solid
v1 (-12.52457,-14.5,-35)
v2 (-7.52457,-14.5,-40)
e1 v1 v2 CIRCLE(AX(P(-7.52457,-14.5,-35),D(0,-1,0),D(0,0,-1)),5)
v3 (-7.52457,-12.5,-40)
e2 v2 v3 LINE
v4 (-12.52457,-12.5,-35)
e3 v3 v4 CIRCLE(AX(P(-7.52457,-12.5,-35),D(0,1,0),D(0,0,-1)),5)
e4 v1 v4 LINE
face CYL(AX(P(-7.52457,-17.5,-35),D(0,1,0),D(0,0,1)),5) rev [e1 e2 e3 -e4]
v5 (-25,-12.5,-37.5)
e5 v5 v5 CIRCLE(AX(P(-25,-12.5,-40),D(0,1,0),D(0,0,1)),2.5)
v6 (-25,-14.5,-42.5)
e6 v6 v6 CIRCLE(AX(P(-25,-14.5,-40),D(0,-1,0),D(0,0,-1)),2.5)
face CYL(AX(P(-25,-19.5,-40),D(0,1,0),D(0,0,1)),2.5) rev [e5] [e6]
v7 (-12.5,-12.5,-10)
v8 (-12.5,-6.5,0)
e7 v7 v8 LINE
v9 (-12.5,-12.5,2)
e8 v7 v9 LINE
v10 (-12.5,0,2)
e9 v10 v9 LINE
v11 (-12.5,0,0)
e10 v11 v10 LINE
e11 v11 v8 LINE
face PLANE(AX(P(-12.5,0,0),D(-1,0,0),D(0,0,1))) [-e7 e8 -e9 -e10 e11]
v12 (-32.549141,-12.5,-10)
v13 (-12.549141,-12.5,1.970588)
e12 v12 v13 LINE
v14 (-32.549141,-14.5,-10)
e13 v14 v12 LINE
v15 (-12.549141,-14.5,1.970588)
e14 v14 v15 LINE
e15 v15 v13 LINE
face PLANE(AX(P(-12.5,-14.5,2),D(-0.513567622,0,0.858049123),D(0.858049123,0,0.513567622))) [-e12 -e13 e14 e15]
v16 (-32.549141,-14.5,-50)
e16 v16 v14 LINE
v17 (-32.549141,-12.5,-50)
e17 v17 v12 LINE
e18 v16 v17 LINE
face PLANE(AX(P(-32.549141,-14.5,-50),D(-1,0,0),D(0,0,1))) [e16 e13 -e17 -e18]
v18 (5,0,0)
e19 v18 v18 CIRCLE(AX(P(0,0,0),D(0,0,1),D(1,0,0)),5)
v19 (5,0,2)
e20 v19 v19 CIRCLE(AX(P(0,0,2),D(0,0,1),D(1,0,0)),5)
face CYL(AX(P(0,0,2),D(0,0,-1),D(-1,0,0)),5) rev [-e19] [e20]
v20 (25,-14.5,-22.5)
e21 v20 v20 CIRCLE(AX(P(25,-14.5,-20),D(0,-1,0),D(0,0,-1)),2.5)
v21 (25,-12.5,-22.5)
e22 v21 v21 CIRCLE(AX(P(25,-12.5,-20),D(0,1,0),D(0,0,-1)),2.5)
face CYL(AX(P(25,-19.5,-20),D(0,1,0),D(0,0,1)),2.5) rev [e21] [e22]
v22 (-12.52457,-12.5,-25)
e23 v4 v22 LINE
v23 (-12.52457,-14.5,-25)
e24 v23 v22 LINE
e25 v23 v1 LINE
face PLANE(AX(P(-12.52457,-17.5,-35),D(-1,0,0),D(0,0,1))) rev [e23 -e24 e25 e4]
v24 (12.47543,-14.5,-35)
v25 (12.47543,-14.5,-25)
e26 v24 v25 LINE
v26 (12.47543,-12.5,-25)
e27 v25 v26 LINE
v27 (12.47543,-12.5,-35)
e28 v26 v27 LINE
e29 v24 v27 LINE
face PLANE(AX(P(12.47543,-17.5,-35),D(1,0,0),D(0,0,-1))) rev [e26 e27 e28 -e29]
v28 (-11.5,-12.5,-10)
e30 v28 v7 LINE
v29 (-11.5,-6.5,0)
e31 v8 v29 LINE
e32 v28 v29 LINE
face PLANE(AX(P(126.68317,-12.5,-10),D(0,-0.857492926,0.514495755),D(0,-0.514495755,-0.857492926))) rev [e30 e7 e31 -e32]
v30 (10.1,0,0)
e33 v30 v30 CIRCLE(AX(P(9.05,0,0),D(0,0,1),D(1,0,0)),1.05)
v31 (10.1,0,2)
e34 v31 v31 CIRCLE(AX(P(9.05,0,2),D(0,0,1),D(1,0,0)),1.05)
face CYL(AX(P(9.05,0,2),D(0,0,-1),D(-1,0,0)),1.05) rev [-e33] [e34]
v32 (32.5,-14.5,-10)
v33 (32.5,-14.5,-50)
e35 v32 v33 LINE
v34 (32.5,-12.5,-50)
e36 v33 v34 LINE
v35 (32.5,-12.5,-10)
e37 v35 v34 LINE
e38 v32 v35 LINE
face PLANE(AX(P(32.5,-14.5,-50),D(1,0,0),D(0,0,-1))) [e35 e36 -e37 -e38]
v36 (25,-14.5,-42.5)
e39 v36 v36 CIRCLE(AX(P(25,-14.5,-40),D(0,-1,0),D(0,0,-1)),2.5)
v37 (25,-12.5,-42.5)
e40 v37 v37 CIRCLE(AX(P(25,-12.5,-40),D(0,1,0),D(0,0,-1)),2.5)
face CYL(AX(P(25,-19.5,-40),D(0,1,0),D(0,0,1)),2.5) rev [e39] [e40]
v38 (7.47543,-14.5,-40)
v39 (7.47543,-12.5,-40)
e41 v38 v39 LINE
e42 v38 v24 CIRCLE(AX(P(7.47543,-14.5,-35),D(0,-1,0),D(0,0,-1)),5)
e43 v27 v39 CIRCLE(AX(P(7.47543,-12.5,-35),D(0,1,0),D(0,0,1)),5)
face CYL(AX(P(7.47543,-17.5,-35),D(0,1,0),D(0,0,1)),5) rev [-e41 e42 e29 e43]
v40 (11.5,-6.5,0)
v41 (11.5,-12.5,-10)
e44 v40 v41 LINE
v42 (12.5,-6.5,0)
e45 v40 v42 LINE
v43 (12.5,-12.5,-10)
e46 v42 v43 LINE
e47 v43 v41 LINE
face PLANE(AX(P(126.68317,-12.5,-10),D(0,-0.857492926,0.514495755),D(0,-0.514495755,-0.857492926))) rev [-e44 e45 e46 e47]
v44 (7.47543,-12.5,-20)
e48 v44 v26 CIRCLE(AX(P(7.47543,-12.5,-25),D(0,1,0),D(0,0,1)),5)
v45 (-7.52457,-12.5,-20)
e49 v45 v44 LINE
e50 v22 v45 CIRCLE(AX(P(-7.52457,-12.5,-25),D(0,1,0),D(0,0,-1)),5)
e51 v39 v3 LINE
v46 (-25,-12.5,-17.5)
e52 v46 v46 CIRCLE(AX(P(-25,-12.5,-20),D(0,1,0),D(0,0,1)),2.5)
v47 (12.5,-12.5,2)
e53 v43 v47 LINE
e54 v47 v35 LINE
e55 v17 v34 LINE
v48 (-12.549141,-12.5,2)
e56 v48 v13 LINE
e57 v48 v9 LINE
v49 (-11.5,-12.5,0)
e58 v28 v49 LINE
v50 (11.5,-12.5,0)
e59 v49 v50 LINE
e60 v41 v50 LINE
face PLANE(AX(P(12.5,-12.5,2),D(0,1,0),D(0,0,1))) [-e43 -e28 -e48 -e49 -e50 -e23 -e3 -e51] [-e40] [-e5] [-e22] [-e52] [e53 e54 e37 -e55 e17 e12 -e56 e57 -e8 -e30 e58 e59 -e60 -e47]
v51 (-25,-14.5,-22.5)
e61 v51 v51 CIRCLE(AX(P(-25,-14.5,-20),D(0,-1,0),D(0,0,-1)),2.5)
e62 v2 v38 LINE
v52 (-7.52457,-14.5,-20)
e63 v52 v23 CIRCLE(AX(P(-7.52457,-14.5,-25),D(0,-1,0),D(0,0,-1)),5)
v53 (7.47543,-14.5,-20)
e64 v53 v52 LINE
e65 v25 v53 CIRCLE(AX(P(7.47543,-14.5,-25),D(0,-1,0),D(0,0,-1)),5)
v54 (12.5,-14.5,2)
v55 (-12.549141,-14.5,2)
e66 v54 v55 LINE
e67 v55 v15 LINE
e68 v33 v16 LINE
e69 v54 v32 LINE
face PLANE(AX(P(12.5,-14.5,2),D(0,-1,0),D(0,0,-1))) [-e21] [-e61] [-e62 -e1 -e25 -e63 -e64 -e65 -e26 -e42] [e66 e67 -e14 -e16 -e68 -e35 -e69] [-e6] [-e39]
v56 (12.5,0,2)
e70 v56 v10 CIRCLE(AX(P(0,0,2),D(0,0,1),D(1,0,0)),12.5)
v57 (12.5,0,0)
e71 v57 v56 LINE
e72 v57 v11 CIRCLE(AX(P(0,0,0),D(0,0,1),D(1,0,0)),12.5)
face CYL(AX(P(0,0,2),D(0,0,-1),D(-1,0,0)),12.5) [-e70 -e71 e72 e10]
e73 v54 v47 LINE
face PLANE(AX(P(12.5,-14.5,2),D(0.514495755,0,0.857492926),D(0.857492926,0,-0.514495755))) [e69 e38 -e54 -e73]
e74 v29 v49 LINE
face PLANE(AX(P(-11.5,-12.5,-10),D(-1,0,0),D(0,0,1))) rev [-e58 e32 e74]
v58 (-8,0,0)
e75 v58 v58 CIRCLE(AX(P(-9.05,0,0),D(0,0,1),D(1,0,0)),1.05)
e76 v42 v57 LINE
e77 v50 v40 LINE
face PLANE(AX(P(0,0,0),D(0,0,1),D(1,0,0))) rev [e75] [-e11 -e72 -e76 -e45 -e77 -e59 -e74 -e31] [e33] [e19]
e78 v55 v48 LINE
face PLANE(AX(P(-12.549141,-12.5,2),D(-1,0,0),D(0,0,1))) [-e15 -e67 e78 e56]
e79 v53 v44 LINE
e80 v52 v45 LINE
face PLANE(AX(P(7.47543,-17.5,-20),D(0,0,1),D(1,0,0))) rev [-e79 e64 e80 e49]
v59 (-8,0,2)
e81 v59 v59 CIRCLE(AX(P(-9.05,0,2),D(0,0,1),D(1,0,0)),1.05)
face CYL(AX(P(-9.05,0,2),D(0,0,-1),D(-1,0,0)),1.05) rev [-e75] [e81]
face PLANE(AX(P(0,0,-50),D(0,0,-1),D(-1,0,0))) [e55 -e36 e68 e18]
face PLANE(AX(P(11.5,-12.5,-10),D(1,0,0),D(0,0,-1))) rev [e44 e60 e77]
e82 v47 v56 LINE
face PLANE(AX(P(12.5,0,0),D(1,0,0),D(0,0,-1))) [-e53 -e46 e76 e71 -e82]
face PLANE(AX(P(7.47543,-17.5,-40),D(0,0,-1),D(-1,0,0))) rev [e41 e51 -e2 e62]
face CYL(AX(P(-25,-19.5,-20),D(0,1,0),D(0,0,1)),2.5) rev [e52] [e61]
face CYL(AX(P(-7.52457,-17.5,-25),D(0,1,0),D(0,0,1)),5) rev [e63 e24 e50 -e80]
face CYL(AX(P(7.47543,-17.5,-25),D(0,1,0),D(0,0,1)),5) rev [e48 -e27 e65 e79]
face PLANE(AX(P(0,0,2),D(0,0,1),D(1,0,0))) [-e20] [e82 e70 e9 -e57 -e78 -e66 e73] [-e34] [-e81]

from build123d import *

# Parameters (mm, degrees)
SKETCH1_R                = 12.5
SKETCH1_R_2              = 1.05
SKETCH1_R_3              = 5
BOSS_EXTRUDE1_DEPTH      = 2
BOSS_EXTRUDE5_START      = -2
BOSS_EXTRUDE5_DEPTH      = 2
BOSS_EXTRUDE6_DEPTH      = 50
BOSS_EXTRUDE6_DEPTH_BACK = 2
SKETCH9_W                = 25.04914064
SKETCH9_H                = 2
BOSS_EXTRUDE7_DEPTH      = 2
SKETCH13_R               = 2.5
CUT_EXTRUDE1_DEPTH       = 7
SKETCH15_W               = 1
SKETCH15_H               = 6
BOSS_EXTRUDE8_DEPTH      = 10
CUT_EXTRUDE2_START       = -1
CUT_EXTRUDE2_DEPTH       = 25
CUT_EXTRUDE3_DEPTH       = 5


# Read off the part's stored shape, not the designer's step: Cut-Extrude2
with BuildPart() as part:
    # Sketch1 → Boss-Extrude1 (new body)
    with BuildSketch(Plane.XY):
        Circle(SKETCH1_R)
        with Locations((-9.05, 0)):
            Circle(SKETCH1_R_2, mode=Mode.SUBTRACT)
        with Locations((9.05, 0)):
            Circle(SKETCH1_R_2, mode=Mode.SUBTRACT)
        Circle(SKETCH1_R_3, mode=Mode.SUBTRACT)
    extrude(amount=BOSS_EXTRUDE1_DEPTH)

    # Sketch2 → Boss-Extrude5 (add)
    with BuildSketch(Plane.XY.offset(2).offset(BOSS_EXTRUDE5_START)):
        with BuildLine():
            ThreePointArc((12.5, 0), (8.838834759, -8.838834771), (-1.6e-08, -12.5))
            Line((-1.6e-08, -12.5), (12.5, -12.5))
            Line((12.5, -12.5), (12.5, 0))
        make_face()
        with BuildLine():
            ThreePointArc((-1.6e-08, -12.5), (-8.838834771, -8.838834759), (-12.5, 0))
            Line((-12.5, 0), (-12.5, -12.5))
            Line((-12.5, -12.5), (-1.6e-08, -12.5))
        make_face()
    extrude(amount=BOSS_EXTRUDE5_DEPTH)

    # Sketch9 → Boss-Extrude6 (add, two sides: drawn at the far end of the back side and taken through both)
    with BuildSketch(Plane(origin=(0, 0, 0), x_dir=(-1, 0, 0), z_dir=(0, 0, -1)).offset(-BOSS_EXTRUDE6_DEPTH_BACK)):
        with Locations((0.02457032, -13.5)):
            Rectangle(SKETCH9_W, SKETCH9_H)
    extrude(amount=BOSS_EXTRUDE6_DEPTH + BOSS_EXTRUDE6_DEPTH_BACK)

    # Sketch12 → Boss-Extrude7 (add)
    with BuildSketch(Plane(origin=(0, -12.5, 0), x_dir=(1, 0, 0), z_dir=(0, 1, 0))):
        Polygon((-12.54914064, 50), (-32.54914064, 50), (-32.54914064, 10), (-12.5, -2), (-12.54914064, 0), align=None)
        Polygon((12.5, 50), (32.5, 50), (32.5, 10), (12.5, -2), (12.5, 0), align=None)
    extrude(amount=-BOSS_EXTRUDE7_DEPTH)

    # Sketch13 → Cut-Extrude1 (cut)
    with BuildSketch(Plane(origin=(0, -12.5, 0), x_dir=(1, 0, 0), z_dir=(0, 1, 0))):
        with Locations(Location((-25, 20, 0), (0, 0, 270))):
            Circle(SKETCH13_R)
        with Locations(Location((-25, 40, 0), (0, 0, 270))):
            Circle(SKETCH13_R)
        with Locations(Location((25, 40, 0), (0, 0, 90))):
            Circle(SKETCH13_R)
        with Locations(Location((25, 20, 0), (0, 0, 90))):
            Circle(SKETCH13_R)
    extrude(amount=-CUT_EXTRUDE1_DEPTH, mode=Mode.SUBTRACT)

    # Sketch15 → Boss-Extrude8 (add)
    with BuildSketch(Plane(origin=(0, 0, 0), x_dir=(-1, 0, 0), z_dir=(0, 0, -1))):
        with Locations((12, -9.5)):
            Rectangle(SKETCH15_W, SKETCH15_H)
        with Locations((-12, -9.5)):
            Rectangle(SKETCH15_W, SKETCH15_H)
    extrude(amount=BOSS_EXTRUDE8_DEPTH)

    # Cut-Extrude2 outline → Cut-Extrude2 (cut)
    with BuildSketch(Plane(origin=(-11.5, 0, 0), x_dir=(0, 0, -1), z_dir=(1, 0, 0)).offset(CUT_EXTRUDE2_START)):
        Polygon((10, -6.5), (0, -6.5), (10, -12.5), align=None)
    extrude(amount=CUT_EXTRUDE2_DEPTH, mode=Mode.SUBTRACT)

    # Sketch17 → Cut-Extrude3 (cut)
    with BuildSketch(Plane(origin=(0, -12.5, 0), x_dir=(1, 0, 0), z_dir=(0, 1, 0))):
        with BuildLine():
            Line((7.47542968, 40), (-7.52457032, 40))
            ThreePointArc((-7.52457032, 40), (-11.060104226, 38.535533906), (-12.52457032, 35))
            Line((-12.52457032, 35), (-12.52457032, 25))
            ThreePointArc((-12.52457032, 25), (-11.060104226, 21.464466094), (-7.52457032, 20))
            Line((-7.52457032, 20), (7.47542968, 20))
            ThreePointArc((7.47542968, 20), (11.010963586, 21.464466094), (12.47542968, 25))
            Line((12.47542968, 25), (12.47542968, 35))
            ThreePointArc((12.47542968, 35), (11.010963586, 38.535533906), (7.47542968, 40))
        make_face()
    extrude(amount=-CUT_EXTRUDE3_DEPTH, mode=Mode.SUBTRACT)


solid = part.part
